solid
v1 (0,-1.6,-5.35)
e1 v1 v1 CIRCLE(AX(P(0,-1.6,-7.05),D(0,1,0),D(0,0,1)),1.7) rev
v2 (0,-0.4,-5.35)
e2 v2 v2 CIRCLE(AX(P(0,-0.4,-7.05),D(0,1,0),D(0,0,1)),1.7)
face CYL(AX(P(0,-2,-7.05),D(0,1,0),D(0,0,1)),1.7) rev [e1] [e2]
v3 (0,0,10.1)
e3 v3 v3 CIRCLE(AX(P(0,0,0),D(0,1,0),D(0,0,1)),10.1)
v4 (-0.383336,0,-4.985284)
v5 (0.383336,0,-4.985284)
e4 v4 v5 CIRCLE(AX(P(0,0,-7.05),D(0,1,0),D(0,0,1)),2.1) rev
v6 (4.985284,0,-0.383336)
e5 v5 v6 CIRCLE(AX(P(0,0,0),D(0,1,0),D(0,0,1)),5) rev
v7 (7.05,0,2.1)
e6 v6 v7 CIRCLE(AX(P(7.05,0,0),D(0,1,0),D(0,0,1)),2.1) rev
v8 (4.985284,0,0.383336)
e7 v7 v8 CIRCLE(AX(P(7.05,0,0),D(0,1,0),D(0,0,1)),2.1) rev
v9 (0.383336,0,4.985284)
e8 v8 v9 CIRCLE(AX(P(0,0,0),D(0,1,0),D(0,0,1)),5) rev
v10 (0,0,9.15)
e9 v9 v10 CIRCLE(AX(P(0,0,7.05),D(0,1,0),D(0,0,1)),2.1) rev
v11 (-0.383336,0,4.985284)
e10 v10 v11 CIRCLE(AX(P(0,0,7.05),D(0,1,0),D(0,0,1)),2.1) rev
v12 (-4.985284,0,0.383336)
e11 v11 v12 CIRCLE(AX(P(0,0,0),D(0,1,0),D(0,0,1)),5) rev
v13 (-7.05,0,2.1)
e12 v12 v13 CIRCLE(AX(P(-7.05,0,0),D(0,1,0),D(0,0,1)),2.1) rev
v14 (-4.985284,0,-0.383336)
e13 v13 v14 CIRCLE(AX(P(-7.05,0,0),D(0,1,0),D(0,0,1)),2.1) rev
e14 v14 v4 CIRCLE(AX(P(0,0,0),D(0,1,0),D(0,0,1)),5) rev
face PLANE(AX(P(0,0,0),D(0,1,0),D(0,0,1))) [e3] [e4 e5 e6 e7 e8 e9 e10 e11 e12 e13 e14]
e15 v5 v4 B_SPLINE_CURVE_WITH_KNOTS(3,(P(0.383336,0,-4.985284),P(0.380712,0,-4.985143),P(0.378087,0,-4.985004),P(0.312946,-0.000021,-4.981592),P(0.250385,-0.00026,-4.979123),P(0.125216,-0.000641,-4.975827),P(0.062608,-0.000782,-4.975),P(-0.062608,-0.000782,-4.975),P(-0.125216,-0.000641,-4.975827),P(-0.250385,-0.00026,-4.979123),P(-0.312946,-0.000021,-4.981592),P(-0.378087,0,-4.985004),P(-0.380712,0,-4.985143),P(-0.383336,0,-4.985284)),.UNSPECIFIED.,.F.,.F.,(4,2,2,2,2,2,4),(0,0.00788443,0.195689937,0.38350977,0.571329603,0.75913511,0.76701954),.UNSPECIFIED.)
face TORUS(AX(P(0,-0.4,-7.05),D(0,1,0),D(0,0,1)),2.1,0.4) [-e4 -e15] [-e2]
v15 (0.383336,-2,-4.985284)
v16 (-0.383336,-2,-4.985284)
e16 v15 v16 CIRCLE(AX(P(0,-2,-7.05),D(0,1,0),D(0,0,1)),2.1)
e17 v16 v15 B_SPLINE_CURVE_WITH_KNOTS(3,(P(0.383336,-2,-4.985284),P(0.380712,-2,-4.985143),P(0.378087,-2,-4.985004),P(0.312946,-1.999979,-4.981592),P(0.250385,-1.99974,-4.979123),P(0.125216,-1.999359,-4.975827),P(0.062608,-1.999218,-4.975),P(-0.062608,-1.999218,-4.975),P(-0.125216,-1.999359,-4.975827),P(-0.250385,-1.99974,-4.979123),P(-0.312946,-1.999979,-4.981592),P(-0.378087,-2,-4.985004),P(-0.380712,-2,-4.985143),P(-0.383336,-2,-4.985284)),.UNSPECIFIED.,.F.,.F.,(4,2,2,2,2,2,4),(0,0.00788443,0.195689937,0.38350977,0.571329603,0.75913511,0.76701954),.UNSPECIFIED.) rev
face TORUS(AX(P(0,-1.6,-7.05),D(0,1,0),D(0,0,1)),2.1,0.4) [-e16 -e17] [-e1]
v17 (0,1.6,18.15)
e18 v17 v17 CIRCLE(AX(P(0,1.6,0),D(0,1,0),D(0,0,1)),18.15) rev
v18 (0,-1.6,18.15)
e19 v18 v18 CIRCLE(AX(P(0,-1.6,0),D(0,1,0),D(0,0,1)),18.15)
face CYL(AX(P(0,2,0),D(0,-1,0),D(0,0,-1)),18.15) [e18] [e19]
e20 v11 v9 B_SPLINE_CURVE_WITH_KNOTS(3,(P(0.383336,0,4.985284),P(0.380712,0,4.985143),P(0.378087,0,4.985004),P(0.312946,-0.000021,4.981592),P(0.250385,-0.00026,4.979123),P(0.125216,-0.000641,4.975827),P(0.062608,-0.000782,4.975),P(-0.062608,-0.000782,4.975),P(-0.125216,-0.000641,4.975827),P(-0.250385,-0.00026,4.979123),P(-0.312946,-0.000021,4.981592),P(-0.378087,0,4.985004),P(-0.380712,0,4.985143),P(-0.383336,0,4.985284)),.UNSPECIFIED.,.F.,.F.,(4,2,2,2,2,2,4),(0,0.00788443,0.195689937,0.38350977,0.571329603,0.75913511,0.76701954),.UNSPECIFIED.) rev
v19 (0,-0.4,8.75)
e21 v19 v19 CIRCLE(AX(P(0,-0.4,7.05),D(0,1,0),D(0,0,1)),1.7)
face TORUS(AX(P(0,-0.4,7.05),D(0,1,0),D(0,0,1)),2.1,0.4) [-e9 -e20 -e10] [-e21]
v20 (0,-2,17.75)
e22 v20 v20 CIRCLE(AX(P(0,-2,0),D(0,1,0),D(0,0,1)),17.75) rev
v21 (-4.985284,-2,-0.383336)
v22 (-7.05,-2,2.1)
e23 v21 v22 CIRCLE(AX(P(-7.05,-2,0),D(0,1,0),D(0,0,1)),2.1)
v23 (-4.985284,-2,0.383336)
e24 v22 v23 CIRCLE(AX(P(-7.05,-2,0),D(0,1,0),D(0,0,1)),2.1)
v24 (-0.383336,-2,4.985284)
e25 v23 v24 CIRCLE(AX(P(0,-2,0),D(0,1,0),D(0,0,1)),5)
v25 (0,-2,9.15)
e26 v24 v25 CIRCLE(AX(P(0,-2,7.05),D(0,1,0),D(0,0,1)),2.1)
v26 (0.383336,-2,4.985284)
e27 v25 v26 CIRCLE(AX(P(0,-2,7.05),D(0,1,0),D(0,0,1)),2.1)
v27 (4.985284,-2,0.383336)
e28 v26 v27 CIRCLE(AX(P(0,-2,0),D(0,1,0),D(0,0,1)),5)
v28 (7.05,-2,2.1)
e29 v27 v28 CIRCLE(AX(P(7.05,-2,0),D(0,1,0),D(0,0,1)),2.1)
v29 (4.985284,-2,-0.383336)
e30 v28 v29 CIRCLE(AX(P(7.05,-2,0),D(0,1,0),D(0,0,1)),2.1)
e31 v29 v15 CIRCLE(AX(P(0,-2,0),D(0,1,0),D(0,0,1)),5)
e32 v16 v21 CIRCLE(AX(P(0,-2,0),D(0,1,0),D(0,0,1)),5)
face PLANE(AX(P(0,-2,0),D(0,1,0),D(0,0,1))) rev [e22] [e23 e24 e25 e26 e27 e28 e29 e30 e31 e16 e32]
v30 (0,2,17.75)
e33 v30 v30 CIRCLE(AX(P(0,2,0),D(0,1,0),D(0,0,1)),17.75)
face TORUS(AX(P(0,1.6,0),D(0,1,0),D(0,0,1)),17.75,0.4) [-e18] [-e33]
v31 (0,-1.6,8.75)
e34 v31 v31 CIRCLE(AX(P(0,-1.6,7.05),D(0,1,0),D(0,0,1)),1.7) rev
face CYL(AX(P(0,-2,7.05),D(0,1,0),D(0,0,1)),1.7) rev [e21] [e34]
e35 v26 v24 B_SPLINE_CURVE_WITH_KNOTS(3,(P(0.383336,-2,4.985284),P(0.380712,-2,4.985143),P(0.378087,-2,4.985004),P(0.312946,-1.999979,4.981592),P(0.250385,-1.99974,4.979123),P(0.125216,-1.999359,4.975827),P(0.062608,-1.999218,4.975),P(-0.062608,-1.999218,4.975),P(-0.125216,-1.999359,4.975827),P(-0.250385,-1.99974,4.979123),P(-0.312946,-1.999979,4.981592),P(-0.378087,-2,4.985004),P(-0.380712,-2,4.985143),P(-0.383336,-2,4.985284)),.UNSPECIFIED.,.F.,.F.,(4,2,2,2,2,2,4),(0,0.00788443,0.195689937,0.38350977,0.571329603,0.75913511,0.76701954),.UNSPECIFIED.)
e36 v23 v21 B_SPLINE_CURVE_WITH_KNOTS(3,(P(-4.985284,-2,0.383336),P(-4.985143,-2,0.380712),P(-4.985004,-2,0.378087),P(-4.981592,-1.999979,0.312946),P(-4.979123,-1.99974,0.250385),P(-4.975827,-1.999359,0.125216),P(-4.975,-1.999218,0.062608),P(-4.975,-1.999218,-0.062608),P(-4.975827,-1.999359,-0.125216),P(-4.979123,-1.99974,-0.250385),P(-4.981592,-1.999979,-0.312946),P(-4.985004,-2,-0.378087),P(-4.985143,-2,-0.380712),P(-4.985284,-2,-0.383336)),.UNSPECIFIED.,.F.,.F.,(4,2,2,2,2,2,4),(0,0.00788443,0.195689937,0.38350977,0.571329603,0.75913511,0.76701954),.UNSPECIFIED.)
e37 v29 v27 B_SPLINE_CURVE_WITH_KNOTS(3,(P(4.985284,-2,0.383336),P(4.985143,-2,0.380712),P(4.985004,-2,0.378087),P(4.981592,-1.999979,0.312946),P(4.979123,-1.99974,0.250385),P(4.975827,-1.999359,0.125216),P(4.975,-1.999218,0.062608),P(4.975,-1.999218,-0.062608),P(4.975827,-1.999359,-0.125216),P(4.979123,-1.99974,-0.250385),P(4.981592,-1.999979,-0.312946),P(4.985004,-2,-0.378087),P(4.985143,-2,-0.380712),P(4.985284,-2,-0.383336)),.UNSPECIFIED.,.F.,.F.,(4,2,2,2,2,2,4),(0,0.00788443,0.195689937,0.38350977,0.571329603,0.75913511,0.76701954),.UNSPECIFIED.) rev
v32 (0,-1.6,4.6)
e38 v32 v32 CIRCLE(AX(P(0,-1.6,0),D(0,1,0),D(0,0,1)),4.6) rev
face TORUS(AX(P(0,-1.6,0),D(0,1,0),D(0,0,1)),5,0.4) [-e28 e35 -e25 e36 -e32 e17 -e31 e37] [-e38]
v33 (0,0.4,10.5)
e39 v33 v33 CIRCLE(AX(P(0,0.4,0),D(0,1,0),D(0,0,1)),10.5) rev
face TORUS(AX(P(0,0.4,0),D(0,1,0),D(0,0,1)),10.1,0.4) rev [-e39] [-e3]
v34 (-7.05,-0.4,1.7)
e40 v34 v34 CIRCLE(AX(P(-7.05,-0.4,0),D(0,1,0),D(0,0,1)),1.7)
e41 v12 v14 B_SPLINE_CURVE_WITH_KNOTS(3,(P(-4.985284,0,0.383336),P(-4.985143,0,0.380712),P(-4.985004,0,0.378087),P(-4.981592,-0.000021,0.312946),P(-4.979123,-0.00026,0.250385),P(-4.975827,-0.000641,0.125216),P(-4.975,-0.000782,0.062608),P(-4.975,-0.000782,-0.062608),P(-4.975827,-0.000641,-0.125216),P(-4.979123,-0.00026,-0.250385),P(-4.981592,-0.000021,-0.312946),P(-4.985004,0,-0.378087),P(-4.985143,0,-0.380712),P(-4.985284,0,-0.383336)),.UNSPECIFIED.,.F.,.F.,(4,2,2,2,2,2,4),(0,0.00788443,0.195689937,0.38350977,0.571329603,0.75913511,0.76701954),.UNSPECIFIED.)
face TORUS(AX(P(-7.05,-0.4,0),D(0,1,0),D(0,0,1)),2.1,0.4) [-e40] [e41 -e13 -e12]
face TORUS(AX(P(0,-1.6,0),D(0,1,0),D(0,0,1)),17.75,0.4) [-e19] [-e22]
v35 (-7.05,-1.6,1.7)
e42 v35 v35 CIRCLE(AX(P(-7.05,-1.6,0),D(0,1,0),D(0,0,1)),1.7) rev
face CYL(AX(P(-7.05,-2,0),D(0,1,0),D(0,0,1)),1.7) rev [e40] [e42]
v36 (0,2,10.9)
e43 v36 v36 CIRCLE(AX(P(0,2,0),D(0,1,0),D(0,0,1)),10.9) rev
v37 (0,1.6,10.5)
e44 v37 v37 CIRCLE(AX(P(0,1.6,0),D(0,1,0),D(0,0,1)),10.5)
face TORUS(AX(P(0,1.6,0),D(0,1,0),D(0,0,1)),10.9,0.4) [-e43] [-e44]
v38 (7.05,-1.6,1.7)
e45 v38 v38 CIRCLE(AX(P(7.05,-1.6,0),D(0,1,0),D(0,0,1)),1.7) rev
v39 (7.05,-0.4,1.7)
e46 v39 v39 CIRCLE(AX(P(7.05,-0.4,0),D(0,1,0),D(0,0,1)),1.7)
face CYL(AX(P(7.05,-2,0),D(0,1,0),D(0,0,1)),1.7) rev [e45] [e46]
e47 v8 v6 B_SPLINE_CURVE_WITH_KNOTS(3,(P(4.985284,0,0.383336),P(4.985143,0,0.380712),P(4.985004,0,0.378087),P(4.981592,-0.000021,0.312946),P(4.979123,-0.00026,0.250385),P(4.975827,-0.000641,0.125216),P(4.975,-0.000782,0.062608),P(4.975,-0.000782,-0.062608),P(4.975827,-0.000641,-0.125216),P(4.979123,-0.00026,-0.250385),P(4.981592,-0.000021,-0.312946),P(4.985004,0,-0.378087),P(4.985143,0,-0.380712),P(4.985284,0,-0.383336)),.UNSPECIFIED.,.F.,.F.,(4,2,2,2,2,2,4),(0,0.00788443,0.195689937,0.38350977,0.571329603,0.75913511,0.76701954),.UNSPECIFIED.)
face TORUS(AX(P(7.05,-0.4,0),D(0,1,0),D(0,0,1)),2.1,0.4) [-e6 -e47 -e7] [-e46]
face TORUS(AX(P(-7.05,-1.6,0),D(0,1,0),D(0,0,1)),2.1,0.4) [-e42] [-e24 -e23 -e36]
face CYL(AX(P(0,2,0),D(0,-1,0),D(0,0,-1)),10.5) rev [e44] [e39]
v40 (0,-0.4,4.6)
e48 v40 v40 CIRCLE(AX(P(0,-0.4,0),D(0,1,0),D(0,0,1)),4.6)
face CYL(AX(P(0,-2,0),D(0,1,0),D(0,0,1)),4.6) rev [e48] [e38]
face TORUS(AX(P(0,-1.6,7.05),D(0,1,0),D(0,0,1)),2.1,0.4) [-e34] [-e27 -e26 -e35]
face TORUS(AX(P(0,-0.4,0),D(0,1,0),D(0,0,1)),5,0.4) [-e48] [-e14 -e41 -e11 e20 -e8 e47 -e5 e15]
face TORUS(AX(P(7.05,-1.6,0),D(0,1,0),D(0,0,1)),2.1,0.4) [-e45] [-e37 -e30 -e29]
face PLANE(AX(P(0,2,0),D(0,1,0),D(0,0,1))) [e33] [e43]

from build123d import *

# Parameters (mm, degrees)
SKETCH1_R           = 18.15
SKETCH1_R_2         = 10.5
BOSS_EXTRUDE1_DEPTH = 2
BOSS_EXTRUDE2_START = -2
SKETCH1_3_R         = 18.15
SKETCH1_3_R_2       = 10.5
BOSS_EXTRUDE2_DEPTH = 2
SKETCH2_R           = 4.6
SKETCH2_R_2         = 1.7
CUT_EXTRUDE1_DEPTH  = 2
FILLET1_R           = 0.4


with BuildPart() as part:
    # Sketch1 → Boss-Extrude1 (new body)
    with BuildSketch(Plane(origin=(0, 0, 0), x_dir=(1, 0, 0), z_dir=(0, 1, 0))):
        with Locations(Location((0, 0, 0), (0, 0, 270))):
            Circle(SKETCH1_R)
        with Locations(Location((0, 0, 0), (0, 0, 270))):
            Circle(SKETCH1_R_2, mode=Mode.SUBTRACT)
    extrude(amount=BOSS_EXTRUDE1_DEPTH)

    # Sketch1<3> → Boss-Extrude2 (add)
    # profile 1 of 2: a face of its own
    with BuildSketch(Plane(origin=(0, 0, 0), x_dir=(1, 0, 0), z_dir=(0, 1, 0)).offset(BOSS_EXTRUDE2_START)):
        with Locations(Location((0, 0, 0), (0, 0, 270))):
            Circle(SKETCH1_3_R)
        with Locations(Location((0, 0, 0), (0, 0, 270))):
            Circle(SKETCH1_3_R_2, mode=Mode.SUBTRACT)
    # profile 2 of 2: a face of its own
    with BuildSketch(Plane(origin=(0, 0, 0), x_dir=(1, 0, 0), z_dir=(0, 1, 0)).offset(BOSS_EXTRUDE2_START)):
        with Locations(Location((0, 0, 0), (0, 0, 270))):
            Circle(SKETCH1_3_R_2)
    extrude(amount=BOSS_EXTRUDE2_DEPTH)

    # Sketch2 → Cut-Extrude1 (cut)
    with BuildSketch(Plane(origin=(0, 0, 0), x_dir=(1, 0, 0), z_dir=(0, 1, 0))):
        with Locations(Location((0, 0, 0), (0, 0, 270))):
            Circle(SKETCH2_R)
        with Locations(Location((0, 7.05, 0), (0, 0, 270))):
            Circle(SKETCH2_R_2)
        with Locations(Location((7.05, 0, 0), (0, 0, 270))):
            Circle(SKETCH2_R_2)
        with Locations(Location((0, -7.05, 0), (0, 0, 270))):
            Circle(SKETCH2_R_2)
        with Locations(Location((-7.05, 0, 0), (0, 0, 270))):
            Circle(SKETCH2_R_2)
    extrude(amount=-CUT_EXTRUDE1_DEPTH, mode=Mode.SUBTRACT)

    # Fillet1
    # the kernel refuses this fillet: 0.4 mm, written as the material it adds along each edge
    with BuildSketch(Plane(origin=(0, 0, 0), x_dir=(0, 0, 1), z_dir=(-1, 0, 0))) as fillet1_piece_1:
        with BuildLine():
            CenterArc((10.1001, 0.3999), FILLET1_R, 270, 90)
            Line((10.1001, -0.0001), (10.1001, -0.0081))
            ThreePointArc((10.1001, -0.0081), (10.30005, -0.008), (10.5, -0.008))
            Line((10.5, -0.008), (10.508, 0))
            ThreePointArc((10.508, 0), (10.508, 0.19995), (10.5081, 0.3999))
            Line((10.5081, 0.3999), (10.5001, 0.3999))
        make_face()
    revolve(axis=Axis((0, 0, 0), (0, 1, 0)))
    # the kernel refuses this fillet: 0.4 mm, written as the material it takes off along each edge
    with BuildSketch(Plane(origin=(0, -2, -7.05), x_dir=(0, 0, 1), z_dir=(-1, 0, 0))) as fillet1_2_piece_1:
        with BuildLine():
            CenterArc((2.0999, 0.3999), FILLET1_R, 180, 90)
            Line((1.6999, 0.3999), (1.6919, 0.3999))
            ThreePointArc((1.6919, 0.3999), (1.692, 0.19995), (1.692, 0))
            Line((1.692, 0), (1.7, -0.008))
            ThreePointArc((1.7, -0.008), (1.89995, -0.008), (2.0999, -0.0081))
            Line((2.0999, -0.0081), (2.0999, -0.0001))
        make_face()
    revolve(axis=Axis((0, -2, -7.05), (0, 1, 0)), mode=Mode.SUBTRACT)
    with BuildSketch(Plane(origin=(0, 0, -7.05), x_dir=(0, 0, 1), z_dir=(-1, 0, 0))) as fillet1_2_piece_2:
        with BuildLine():
            CenterArc((2.0999, -0.3999), FILLET1_R, 90, 90)
            Line((2.0999, 0.0001), (2.0999, 0.0081))
            ThreePointArc((2.0999, 0.0081), (1.89995, 0.008), (1.7, 0.008))
            Line((1.7, 0.008), (1.692, 0))
            ThreePointArc((1.692, 0), (1.692, -0.19995), (1.6919, -0.3999))
            Line((1.6919, -0.3999), (1.6999, -0.3999))
        make_face()
    revolve(axis=Axis((0, 0, -7.05), (0, 1, 0)), mode=Mode.SUBTRACT)
    with BuildSketch(Plane(origin=(7.05, -2, 0), x_dir=(0, 0, 1), z_dir=(-1, 0, 0))) as fillet1_2_piece_3:
        with BuildLine():
            CenterArc((2.0999, 0.3999), FILLET1_R, 180, 90)
            Line((1.6999, 0.3999), (1.6919, 0.3999))
            ThreePointArc((1.6919, 0.3999), (1.692, 0.19995), (1.692, 0))
            Line((1.692, 0), (1.7, -0.008))
            ThreePointArc((1.7, -0.008), (1.89995, -0.008), (2.0999, -0.0081))
            Line((2.0999, -0.0081), (2.0999, -0.0001))
        make_face()
    revolve(axis=Axis((7.05, -2, 0), (0, 1, 0)), mode=Mode.SUBTRACT)
    with BuildSketch(Plane(origin=(7.05, 0, 0), x_dir=(0, 0, 1), z_dir=(-1, 0, 0))) as fillet1_2_piece_4:
        with BuildLine():
            CenterArc((2.0999, -0.3999), FILLET1_R, 90, 90)
            Line((2.0999, 0.0001), (2.0999, 0.0081))
            ThreePointArc((2.0999, 0.0081), (1.89995, 0.008), (1.7, 0.008))
            Line((1.7, 0.008), (1.692, 0))
            ThreePointArc((1.692, 0), (1.692, -0.19995), (1.6919, -0.3999))
            Line((1.6919, -0.3999), (1.6999, -0.3999))
        make_face()
    revolve(axis=Axis((7.05, 0, 0), (0, 1, 0)), mode=Mode.SUBTRACT)
    with BuildSketch(Plane(origin=(0, -2, 7.05), x_dir=(0, 0, 1), z_dir=(-1, 0, 0))) as fillet1_2_piece_5:
        with BuildLine():
            CenterArc((2.0999, 0.3999), FILLET1_R, 180, 90)
            Line((1.6999, 0.3999), (1.6919, 0.3999))
            ThreePointArc((1.6919, 0.3999), (1.692, 0.19995), (1.692, 0))
            Line((1.692, 0), (1.7, -0.008))
            ThreePointArc((1.7, -0.008), (1.89995, -0.008), (2.0999, -0.0081))
            Line((2.0999, -0.0081), (2.0999, -0.0001))
        make_face()
    revolve(axis=Axis((0, -2, 7.05), (0, 1, 0)), mode=Mode.SUBTRACT)
    with BuildSketch(Plane(origin=(0, 0, 7.05), x_dir=(0, 0, 1), z_dir=(-1, 0, 0))) as fillet1_2_piece_6:
        with BuildLine():
            CenterArc((2.0999, -0.3999), FILLET1_R, 90, 90)
            Line((2.0999, 0.0001), (2.0999, 0.0081))
            ThreePointArc((2.0999, 0.0081), (1.89995, 0.008), (1.7, 0.008))
            Line((1.7, 0.008), (1.692, 0))
            ThreePointArc((1.692, 0), (1.692, -0.19995), (1.6919, -0.3999))
            Line((1.6919, -0.3999), (1.6999, -0.3999))
        make_face()
    revolve(axis=Axis((0, 0, 7.05), (0, 1, 0)), mode=Mode.SUBTRACT)
    with BuildSketch(Plane(origin=(-7.05, -2, 0), x_dir=(0, 0, 1), z_dir=(-1, 0, 0))) as fillet1_2_piece_7:
        with BuildLine():
            CenterArc((2.0999, 0.3999), FILLET1_R, 180, 90)
            Line((1.6999, 0.3999), (1.6919, 0.3999))
            ThreePointArc((1.6919, 0.3999), (1.692, 0.19995), (1.692, 0))
            Line((1.692, 0), (1.7, -0.008))
            ThreePointArc((1.7, -0.008), (1.89995, -0.008), (2.0999, -0.0081))
            Line((2.0999, -0.0081), (2.0999, -0.0001))
        make_face()
    revolve(axis=Axis((-7.05, -2, 0), (0, 1, 0)), mode=Mode.SUBTRACT)
    with BuildSketch(Plane(origin=(-7.05, 0, 0), x_dir=(0, 0, 1), z_dir=(-1, 0, 0))) as fillet1_2_piece_8:
        with BuildLine():
            CenterArc((2.0999, -0.3999), FILLET1_R, 90, 90)
            Line((2.0999, 0.0001), (2.0999, 0.0081))
            ThreePointArc((2.0999, 0.0081), (1.89995, 0.008), (1.7, 0.008))
            Line((1.7, 0.008), (1.692, 0))
            ThreePointArc((1.692, 0), (1.692, -0.19995), (1.6919, -0.3999))
            Line((1.6919, -0.3999), (1.6999, -0.3999))
        make_face()
    revolve(axis=Axis((-7.05, 0, 0), (0, 1, 0)), mode=Mode.SUBTRACT)
    with BuildSketch(Plane(origin=(0, -2, 0), x_dir=(0, 0, 1), z_dir=(-1, 0, 0))) as fillet1_2_piece_9:
        with BuildLine():
            CenterArc((4.9999, 0.3999), FILLET1_R, 180, 90)
            Line((4.5999, 0.3999), (4.5919, 0.3999))
            ThreePointArc((4.5919, 0.3999), (4.592, 0.19995), (4.592, 0))
            Line((4.592, 0), (4.6, -0.008))
            ThreePointArc((4.6, -0.008), (4.79995, -0.008), (4.9999, -0.0081))
            Line((4.9999, -0.0081), (4.9999, -0.0001))
        make_face()
    revolve(axis=Axis((0, -2, 0), (0, 1, 0)), mode=Mode.SUBTRACT)
    with BuildSketch(Plane(origin=(0, 0, 0), x_dir=(0, 0, 1), z_dir=(-1, 0, 0))) as fillet1_2_piece_10:
        with BuildLine():
            CenterArc((4.9999, -0.3999), FILLET1_R, 90, 90)
            Line((4.9999, 0.0001), (4.9999, 0.0081))
            ThreePointArc((4.9999, 0.0081), (4.79995, 0.008), (4.6, 0.008))
            Line((4.6, 0.008), (4.592, 0))
            ThreePointArc((4.592, 0), (4.592, -0.19995), (4.5919, -0.3999))
            Line((4.5919, -0.3999), (4.5999, -0.3999))
        make_face()
    revolve(axis=Axis((0, 0, 0), (0, 1, 0)), mode=Mode.SUBTRACT)
    with BuildSketch(Plane(origin=(0, 2, 0), x_dir=(0, 0, 1), z_dir=(-1, 0, 0))) as fillet1_2_piece_11:
        with BuildLine():
            CenterArc((17.7501, -0.3999), FILLET1_R, 0, 90)
            Line((17.7501, 0.0001), (17.7501, 0.0081))
            ThreePointArc((17.7501, 0.0081), (17.95005, 0.008), (18.15, 0.008))
            Line((18.15, 0.008), (18.158, 0))
            ThreePointArc((18.158, 0), (18.158, -0.19995), (18.1581, -0.3999))
            Line((18.1581, -0.3999), (18.1501, -0.3999))
        make_face()
    revolve(axis=Axis((0, 2, 0), (0, 1, 0)), mode=Mode.SUBTRACT)
    with BuildSketch(Plane(origin=(0, 2, 0), x_dir=(0, 0, 1), z_dir=(-1, 0, 0))) as fillet1_2_piece_12:
        with BuildLine():
            CenterArc((10.8999, -0.3999), FILLET1_R, 90, 90)
            Line((10.4999, -0.3999), (10.4919, -0.3999))
            ThreePointArc((10.4919, -0.3999), (10.492, -0.19995), (10.492, 0))
            Line((10.492, 0), (10.5, 0.008))
            ThreePointArc((10.5, 0.008), (10.69995, 0.008), (10.8999, 0.0081))
            Line((10.8999, 0.0081), (10.8999, 0.0001))
        make_face()
    revolve(axis=Axis((0, 2, 0), (0, 1, 0)), mode=Mode.SUBTRACT)
    with BuildSketch(Plane(origin=(0, -2, 0), x_dir=(0, 0, 1), z_dir=(-1, 0, 0))) as fillet1_2_piece_13:
        with BuildLine():
            CenterArc((17.7501, 0.3999), FILLET1_R, 270, 90)
            Line((17.7501, -0.0001), (17.7501, -0.0081))
            ThreePointArc((17.7501, -0.0081), (17.95005, -0.008), (18.15, -0.008))
            Line((18.15, -0.008), (18.158, 0))
            ThreePointArc((18.158, 0), (18.158, 0.19995), (18.1581, 0.3999))
            Line((18.1581, 0.3999), (18.1501, 0.3999))
        make_face()
    revolve(axis=Axis((0, -2, 0), (0, 1, 0)), mode=Mode.SUBTRACT)


solid = part.part
